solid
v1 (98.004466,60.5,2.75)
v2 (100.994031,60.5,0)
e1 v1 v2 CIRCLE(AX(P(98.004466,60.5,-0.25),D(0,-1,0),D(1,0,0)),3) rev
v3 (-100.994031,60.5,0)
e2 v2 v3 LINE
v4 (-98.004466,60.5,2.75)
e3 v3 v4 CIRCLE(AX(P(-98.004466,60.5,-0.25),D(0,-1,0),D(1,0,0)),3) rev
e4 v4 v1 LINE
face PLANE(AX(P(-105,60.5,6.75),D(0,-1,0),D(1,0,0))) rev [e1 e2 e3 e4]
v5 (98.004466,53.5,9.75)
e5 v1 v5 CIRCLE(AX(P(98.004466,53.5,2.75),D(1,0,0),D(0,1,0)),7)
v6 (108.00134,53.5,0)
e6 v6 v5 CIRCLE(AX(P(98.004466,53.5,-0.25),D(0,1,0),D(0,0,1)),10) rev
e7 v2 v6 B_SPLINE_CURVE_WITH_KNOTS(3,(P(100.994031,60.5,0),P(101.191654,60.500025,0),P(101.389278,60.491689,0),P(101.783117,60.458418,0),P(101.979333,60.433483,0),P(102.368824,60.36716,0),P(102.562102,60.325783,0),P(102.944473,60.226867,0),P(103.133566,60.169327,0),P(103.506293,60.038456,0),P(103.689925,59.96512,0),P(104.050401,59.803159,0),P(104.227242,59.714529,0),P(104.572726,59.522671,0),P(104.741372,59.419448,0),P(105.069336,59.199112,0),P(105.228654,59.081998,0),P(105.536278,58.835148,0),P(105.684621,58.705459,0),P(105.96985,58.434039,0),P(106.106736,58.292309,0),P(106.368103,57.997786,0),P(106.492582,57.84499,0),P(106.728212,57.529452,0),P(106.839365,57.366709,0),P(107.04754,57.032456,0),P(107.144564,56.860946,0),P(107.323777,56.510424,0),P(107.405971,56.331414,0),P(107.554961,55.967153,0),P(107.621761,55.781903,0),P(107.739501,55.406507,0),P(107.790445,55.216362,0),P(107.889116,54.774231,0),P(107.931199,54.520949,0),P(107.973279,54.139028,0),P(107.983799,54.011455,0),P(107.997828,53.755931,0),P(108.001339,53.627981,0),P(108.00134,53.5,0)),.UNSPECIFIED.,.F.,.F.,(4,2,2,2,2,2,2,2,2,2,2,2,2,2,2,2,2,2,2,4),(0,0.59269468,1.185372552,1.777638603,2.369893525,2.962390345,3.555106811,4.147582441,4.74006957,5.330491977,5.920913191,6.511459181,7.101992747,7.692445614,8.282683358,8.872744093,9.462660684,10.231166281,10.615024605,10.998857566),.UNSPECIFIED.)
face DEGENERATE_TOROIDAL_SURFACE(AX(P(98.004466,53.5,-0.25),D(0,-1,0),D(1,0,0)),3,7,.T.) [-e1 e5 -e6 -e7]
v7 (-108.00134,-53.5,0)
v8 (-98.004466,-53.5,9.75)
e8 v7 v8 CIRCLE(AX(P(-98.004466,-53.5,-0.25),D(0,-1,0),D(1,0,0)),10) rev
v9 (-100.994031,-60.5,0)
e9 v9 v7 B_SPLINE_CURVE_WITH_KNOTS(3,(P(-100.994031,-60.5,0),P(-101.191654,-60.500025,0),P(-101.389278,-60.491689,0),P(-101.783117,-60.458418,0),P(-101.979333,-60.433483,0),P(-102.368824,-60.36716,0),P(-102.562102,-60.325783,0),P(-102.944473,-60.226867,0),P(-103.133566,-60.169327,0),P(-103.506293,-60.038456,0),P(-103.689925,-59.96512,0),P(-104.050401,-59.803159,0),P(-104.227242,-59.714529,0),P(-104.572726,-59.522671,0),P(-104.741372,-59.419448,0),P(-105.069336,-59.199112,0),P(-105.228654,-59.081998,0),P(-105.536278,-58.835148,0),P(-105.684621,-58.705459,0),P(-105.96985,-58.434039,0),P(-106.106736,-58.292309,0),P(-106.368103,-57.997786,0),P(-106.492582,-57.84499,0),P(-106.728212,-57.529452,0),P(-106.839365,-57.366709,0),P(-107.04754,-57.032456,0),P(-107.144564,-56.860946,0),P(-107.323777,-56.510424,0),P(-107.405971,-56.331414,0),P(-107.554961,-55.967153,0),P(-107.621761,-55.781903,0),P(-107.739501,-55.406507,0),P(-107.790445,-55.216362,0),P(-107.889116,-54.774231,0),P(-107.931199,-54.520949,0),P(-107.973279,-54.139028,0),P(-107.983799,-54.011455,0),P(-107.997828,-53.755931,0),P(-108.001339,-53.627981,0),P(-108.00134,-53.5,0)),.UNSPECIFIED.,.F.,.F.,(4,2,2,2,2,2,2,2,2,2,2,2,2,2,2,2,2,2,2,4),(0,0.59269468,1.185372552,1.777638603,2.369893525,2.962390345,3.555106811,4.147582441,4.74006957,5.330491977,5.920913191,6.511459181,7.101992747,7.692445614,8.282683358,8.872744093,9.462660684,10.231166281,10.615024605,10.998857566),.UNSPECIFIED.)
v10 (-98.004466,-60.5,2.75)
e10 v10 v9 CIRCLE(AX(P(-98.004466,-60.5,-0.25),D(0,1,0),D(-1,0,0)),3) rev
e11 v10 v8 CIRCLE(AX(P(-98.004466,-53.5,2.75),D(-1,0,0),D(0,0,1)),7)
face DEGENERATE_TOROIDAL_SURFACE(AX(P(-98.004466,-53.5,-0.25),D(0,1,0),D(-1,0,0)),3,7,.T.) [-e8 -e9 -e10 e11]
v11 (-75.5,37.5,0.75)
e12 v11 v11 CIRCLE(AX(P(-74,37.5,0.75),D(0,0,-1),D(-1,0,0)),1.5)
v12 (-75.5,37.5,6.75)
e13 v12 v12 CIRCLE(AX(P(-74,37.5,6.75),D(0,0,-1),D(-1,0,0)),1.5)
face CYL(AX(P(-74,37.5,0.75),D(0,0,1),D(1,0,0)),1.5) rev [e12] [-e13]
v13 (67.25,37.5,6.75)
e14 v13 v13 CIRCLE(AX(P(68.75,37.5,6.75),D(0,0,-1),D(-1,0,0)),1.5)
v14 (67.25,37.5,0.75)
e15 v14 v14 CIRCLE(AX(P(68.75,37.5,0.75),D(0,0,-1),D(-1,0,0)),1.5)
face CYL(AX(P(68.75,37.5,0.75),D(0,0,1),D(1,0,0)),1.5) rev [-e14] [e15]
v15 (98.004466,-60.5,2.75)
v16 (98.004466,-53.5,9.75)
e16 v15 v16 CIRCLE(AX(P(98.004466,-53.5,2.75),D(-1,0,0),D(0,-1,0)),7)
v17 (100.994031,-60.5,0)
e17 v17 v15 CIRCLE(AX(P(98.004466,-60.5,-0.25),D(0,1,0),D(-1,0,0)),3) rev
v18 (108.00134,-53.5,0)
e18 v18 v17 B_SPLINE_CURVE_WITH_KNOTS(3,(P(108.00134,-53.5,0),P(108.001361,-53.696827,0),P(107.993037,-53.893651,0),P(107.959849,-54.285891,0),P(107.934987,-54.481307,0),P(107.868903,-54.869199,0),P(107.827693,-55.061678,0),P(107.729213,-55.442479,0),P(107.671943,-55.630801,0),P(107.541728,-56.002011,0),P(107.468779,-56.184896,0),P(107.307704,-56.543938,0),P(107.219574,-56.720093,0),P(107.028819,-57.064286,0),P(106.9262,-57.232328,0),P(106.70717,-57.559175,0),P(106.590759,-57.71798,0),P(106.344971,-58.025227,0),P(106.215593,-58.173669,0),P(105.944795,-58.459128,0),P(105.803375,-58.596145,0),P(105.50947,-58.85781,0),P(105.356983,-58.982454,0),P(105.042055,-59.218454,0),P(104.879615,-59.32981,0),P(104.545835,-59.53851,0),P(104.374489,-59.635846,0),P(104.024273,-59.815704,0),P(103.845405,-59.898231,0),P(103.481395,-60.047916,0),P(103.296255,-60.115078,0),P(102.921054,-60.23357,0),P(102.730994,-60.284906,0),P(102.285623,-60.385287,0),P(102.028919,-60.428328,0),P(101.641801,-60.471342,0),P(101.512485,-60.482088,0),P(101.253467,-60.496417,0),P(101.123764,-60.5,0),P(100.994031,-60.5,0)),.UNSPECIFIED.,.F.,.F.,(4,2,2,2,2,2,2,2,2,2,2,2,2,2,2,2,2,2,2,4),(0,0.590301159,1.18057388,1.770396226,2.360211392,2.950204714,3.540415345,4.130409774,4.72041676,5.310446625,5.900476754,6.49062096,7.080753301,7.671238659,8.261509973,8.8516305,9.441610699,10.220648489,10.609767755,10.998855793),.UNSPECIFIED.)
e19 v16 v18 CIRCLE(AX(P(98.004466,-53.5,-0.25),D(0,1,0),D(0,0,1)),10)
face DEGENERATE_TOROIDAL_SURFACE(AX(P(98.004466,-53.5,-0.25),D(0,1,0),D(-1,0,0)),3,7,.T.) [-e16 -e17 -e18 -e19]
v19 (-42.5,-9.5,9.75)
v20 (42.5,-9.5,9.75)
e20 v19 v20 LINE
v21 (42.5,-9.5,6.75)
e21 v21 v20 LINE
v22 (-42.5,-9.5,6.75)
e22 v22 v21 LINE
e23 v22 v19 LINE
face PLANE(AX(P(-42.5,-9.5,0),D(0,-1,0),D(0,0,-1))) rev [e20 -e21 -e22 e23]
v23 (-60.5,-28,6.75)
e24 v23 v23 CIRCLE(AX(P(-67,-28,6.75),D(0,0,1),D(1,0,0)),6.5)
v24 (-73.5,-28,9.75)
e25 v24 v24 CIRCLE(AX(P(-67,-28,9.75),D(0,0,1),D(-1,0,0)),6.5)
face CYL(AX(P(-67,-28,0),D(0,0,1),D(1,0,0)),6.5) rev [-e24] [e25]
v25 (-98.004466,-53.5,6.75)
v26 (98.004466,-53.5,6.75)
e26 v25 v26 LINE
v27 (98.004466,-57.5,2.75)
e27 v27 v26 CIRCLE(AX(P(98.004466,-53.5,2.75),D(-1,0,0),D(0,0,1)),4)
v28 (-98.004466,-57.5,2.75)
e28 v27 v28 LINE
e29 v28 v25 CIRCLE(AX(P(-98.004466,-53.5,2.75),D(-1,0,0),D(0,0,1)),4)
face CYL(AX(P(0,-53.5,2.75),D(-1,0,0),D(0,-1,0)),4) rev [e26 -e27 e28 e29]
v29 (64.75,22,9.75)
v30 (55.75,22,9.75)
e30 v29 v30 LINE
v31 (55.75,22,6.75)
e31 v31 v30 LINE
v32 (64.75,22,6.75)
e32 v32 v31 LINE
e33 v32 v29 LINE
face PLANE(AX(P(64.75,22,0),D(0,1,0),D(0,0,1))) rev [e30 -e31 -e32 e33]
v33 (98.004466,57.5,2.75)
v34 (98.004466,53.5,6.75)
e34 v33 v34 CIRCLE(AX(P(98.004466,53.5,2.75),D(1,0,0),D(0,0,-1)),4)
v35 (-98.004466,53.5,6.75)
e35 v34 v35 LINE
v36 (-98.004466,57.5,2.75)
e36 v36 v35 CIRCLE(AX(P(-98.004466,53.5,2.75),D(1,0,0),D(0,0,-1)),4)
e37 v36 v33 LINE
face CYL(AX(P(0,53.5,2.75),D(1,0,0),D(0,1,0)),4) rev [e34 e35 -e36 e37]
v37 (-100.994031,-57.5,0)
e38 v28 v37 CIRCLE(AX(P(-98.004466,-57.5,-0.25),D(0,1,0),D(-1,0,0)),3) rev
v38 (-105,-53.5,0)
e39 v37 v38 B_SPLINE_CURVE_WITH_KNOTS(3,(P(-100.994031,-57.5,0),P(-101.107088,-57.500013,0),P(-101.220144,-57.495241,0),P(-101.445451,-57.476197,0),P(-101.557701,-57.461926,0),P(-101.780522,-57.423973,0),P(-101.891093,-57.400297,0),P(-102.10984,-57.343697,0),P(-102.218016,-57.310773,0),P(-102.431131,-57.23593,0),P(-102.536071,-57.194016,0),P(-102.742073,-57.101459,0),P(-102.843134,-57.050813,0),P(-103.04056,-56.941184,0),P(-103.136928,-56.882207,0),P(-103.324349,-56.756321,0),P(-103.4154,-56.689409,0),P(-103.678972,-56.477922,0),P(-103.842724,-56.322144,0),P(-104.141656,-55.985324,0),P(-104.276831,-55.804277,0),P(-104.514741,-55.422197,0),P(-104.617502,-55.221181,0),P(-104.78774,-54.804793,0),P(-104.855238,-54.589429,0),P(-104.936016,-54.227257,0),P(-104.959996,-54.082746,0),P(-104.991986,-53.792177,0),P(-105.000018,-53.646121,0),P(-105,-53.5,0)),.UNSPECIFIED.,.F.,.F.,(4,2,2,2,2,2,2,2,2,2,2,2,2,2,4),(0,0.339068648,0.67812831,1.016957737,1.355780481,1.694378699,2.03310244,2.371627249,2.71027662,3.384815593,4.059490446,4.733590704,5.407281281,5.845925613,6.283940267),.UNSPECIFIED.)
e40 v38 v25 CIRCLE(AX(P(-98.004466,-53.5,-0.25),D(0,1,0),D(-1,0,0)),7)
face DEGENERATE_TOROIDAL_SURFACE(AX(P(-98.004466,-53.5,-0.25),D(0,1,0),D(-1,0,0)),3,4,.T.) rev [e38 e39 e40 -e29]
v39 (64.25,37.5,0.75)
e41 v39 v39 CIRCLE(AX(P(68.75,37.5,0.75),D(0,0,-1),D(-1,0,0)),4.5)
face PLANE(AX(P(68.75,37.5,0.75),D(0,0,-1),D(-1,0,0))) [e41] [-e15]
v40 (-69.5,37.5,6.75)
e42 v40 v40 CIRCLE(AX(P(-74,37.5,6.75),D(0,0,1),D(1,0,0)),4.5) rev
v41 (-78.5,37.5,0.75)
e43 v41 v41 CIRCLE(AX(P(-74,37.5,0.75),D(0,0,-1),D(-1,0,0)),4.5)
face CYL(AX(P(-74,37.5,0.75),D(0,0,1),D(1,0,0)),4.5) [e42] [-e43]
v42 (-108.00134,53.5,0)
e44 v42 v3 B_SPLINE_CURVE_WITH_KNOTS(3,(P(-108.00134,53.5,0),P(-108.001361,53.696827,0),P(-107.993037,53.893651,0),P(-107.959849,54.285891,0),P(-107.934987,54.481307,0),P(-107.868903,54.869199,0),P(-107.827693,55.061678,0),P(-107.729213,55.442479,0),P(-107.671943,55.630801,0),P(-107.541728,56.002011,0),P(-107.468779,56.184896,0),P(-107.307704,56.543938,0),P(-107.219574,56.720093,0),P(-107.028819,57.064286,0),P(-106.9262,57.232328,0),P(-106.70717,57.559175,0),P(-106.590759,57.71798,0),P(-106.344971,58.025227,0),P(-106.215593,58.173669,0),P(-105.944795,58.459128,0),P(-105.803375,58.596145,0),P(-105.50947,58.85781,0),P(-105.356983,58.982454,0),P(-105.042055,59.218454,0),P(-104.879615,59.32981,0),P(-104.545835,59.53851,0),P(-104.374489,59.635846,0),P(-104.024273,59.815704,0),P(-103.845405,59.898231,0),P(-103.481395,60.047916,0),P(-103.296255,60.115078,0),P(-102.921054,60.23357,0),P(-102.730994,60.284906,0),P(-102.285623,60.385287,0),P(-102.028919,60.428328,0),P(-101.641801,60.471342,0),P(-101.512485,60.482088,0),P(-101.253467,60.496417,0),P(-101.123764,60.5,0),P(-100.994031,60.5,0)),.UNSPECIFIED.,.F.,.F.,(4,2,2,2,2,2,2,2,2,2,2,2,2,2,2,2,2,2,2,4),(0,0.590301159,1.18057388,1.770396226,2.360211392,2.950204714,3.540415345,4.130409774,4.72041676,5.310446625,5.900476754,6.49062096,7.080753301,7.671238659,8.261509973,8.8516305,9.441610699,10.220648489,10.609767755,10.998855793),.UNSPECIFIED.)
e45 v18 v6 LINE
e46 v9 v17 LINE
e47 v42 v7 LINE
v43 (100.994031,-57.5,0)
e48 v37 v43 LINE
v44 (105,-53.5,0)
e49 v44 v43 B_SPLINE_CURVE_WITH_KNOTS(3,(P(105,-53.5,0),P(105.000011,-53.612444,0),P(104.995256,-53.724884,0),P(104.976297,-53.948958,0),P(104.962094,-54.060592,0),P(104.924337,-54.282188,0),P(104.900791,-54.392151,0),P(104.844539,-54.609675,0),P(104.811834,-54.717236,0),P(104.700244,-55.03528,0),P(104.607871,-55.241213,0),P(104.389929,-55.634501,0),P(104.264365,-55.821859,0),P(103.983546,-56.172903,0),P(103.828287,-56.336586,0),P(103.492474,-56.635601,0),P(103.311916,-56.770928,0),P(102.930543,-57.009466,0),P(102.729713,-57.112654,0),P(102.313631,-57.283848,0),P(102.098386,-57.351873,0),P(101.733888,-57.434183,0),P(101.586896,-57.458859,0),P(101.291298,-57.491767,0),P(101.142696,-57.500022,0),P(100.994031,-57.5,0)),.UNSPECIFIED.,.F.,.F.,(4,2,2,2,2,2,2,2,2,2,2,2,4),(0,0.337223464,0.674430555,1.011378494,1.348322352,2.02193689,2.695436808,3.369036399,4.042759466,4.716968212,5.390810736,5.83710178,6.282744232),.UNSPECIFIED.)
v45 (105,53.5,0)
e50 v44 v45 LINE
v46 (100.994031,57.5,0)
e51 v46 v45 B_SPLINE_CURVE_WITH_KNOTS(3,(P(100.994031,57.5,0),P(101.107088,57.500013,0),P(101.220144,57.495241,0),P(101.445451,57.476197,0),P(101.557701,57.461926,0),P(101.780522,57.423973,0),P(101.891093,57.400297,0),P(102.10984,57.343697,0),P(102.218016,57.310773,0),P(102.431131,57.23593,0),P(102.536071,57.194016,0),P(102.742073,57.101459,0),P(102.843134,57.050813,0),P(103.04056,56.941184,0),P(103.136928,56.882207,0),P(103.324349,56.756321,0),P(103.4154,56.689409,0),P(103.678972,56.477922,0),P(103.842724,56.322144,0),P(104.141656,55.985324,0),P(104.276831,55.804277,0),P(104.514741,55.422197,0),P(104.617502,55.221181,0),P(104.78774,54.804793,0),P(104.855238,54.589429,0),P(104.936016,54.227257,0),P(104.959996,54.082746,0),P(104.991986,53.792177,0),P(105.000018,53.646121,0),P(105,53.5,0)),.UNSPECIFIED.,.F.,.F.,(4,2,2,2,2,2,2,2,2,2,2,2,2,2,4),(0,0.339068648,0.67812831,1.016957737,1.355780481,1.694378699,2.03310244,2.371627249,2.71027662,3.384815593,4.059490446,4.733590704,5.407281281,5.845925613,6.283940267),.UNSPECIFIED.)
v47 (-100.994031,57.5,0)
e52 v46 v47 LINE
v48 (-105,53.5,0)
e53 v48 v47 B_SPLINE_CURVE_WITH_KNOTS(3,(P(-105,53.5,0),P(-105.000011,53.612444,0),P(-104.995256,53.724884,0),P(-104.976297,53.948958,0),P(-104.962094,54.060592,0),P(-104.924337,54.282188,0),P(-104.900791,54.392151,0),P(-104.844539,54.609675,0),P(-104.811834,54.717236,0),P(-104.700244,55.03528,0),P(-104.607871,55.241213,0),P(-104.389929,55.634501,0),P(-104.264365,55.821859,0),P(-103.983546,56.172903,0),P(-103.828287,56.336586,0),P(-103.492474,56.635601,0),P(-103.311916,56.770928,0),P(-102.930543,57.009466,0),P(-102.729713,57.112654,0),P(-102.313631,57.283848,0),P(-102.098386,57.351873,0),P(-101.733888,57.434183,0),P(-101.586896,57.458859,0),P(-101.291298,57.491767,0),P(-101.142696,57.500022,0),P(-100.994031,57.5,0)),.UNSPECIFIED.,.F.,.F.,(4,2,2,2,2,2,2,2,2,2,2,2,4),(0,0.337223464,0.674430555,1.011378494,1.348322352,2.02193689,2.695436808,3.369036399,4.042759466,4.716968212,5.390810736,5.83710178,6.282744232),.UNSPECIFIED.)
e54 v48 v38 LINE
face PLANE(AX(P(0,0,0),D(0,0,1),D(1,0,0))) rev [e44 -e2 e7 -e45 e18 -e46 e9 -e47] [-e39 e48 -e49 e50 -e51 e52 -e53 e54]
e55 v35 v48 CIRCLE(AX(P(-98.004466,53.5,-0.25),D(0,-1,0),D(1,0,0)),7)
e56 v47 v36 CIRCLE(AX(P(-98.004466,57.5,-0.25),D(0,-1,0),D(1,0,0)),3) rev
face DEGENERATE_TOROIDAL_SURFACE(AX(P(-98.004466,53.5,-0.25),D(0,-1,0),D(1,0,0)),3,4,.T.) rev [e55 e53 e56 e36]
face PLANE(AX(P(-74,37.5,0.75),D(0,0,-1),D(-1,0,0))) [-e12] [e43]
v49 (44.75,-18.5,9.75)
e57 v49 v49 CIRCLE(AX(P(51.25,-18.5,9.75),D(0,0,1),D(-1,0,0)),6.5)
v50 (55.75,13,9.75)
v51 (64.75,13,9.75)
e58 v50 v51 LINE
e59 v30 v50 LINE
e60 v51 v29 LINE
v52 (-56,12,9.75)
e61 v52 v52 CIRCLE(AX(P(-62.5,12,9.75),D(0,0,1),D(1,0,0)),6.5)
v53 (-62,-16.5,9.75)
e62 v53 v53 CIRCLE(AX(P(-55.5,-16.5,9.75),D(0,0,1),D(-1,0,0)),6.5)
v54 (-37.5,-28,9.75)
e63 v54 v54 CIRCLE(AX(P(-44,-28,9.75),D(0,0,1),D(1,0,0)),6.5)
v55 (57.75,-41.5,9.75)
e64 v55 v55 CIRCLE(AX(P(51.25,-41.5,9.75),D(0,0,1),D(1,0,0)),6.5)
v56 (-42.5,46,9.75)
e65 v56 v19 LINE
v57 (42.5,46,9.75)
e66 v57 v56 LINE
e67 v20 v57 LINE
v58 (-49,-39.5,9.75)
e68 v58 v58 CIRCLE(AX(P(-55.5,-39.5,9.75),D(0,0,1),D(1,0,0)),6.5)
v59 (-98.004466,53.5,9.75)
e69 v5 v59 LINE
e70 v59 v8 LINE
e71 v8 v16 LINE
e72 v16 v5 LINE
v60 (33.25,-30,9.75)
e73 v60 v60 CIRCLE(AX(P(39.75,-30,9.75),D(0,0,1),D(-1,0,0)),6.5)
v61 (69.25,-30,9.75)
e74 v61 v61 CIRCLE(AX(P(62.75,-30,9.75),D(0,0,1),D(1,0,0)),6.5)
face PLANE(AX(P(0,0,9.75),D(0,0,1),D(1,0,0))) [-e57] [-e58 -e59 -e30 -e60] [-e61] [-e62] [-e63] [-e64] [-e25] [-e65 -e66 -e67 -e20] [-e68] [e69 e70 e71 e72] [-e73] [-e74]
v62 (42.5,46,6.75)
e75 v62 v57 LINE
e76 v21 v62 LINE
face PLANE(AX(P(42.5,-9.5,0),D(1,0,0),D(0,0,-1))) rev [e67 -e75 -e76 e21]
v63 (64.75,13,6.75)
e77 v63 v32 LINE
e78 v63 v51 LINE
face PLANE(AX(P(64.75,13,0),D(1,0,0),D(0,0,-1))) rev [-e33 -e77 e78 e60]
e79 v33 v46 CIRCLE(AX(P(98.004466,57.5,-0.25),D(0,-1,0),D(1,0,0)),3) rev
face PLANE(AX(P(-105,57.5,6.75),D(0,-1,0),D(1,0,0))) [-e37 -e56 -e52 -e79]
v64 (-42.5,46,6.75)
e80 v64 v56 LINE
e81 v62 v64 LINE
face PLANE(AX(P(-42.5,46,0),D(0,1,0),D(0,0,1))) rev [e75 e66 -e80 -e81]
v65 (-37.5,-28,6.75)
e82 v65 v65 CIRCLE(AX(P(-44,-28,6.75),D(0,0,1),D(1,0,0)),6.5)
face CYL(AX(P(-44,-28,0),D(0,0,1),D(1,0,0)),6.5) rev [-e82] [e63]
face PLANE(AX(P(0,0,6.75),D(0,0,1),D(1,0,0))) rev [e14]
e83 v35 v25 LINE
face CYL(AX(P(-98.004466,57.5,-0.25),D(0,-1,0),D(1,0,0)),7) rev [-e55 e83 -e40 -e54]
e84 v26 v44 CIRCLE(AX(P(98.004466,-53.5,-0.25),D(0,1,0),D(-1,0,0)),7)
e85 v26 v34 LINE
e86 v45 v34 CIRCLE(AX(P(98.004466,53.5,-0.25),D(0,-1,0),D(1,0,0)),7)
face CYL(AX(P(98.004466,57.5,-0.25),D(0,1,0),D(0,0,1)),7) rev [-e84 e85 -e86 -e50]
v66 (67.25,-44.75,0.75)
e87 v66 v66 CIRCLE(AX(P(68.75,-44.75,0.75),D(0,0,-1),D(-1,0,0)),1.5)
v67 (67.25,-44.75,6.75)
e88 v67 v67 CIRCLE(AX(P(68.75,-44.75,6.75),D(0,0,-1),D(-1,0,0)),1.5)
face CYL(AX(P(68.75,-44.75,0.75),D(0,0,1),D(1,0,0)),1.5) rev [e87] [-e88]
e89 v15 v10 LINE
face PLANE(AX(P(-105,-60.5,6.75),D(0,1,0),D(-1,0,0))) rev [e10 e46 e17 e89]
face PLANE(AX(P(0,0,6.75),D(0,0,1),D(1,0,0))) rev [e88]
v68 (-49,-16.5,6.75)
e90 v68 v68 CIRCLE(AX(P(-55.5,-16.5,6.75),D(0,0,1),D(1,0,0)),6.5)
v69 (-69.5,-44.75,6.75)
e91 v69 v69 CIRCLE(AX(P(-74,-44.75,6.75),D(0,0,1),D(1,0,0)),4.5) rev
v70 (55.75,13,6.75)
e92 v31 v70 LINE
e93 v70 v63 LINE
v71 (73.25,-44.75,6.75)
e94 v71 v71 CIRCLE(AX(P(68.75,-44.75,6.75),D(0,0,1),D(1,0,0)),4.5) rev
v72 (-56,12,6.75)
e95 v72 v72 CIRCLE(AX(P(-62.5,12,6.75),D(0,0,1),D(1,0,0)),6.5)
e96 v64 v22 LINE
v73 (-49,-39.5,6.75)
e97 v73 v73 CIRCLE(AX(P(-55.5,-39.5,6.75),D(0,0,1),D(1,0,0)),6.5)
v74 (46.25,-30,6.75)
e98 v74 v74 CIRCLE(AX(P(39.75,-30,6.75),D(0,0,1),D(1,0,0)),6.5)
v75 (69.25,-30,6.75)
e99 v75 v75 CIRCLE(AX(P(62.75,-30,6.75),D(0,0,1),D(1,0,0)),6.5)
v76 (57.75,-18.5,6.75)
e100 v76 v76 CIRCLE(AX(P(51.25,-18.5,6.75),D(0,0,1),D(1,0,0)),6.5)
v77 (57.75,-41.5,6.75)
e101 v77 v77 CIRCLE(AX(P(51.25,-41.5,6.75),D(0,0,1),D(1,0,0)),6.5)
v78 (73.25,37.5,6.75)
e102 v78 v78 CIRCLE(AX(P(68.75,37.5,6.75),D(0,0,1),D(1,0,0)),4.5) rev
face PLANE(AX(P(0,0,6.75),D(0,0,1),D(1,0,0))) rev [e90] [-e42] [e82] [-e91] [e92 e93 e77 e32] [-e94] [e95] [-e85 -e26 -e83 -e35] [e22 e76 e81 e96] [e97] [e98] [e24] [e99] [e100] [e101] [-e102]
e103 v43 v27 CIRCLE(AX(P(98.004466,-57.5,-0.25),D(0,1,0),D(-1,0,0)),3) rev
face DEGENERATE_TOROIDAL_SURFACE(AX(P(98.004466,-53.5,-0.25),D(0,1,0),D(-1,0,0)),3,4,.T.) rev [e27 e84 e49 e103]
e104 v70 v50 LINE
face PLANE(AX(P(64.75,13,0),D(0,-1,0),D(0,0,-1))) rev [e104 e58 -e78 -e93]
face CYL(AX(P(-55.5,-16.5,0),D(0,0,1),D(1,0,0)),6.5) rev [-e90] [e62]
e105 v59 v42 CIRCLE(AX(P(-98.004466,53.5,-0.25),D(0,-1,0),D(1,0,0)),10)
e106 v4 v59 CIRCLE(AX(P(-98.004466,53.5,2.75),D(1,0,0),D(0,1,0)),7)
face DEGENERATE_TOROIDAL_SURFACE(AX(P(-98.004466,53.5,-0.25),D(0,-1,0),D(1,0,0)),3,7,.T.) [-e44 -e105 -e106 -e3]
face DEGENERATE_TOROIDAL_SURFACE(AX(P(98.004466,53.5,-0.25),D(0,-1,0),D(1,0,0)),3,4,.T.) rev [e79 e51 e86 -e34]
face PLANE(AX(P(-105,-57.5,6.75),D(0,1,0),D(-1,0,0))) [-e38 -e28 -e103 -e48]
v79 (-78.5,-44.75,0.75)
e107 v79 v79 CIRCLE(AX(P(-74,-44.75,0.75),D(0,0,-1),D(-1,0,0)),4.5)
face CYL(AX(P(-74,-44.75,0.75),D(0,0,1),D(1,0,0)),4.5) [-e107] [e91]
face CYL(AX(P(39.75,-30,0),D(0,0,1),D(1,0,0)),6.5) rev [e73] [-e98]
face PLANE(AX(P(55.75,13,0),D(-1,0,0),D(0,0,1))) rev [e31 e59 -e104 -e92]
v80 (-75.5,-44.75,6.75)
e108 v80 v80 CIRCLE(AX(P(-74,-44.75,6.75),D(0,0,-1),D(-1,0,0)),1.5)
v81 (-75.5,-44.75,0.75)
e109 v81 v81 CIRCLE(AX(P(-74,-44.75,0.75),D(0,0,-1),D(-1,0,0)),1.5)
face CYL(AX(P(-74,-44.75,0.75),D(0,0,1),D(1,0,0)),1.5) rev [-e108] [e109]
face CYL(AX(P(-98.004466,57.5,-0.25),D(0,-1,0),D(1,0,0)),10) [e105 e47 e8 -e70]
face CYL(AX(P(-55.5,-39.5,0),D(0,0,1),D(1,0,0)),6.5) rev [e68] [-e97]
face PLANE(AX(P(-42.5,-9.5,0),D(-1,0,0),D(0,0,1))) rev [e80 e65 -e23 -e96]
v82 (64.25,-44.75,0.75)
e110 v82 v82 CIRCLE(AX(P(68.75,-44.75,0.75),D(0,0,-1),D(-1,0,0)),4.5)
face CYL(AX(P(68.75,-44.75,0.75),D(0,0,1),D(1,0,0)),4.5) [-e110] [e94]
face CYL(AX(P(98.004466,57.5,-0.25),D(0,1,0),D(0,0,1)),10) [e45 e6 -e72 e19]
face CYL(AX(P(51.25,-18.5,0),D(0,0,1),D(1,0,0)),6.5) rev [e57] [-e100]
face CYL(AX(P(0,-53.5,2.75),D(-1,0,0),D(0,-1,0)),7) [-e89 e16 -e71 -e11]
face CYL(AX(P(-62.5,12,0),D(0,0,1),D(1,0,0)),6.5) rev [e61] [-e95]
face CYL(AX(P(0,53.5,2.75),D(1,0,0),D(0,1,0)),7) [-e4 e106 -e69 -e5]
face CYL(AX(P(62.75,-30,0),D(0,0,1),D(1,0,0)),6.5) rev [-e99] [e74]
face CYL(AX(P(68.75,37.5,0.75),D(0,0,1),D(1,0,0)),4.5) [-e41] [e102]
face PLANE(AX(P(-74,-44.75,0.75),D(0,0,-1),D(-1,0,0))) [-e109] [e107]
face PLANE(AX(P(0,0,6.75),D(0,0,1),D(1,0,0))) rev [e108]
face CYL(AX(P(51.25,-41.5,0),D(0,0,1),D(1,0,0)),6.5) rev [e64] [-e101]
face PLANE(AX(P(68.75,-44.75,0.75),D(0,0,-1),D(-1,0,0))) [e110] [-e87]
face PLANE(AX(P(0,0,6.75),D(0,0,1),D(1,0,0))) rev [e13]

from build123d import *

# Parameters (mm, degrees)
SKETCH_1_W          = 210
SKETCH_1_H          = 115
EXTRUDE_6_DEPTH     = 6.75
FILLET_6_R          = 7
FILLET_7_R          = 4
SHELL_6_T           = 3
SKETCH_10_W         = 85
SKETCH_10_H         = 55.5
CUT_EXTRUDE_1_DEPTH = 125.175690155
SKETCH_11_R         = 6.5
SKETCH_11_W         = 9
SKETCH_11_H         = 9
CUT_EXTRUDE_2_DEPTH = 125.175690155
SKETCH_12_R         = 4.5
SKETCH_12_R_2       = 1.5
EXTRUDE_9_DEPTH     = 6


with BuildPart() as part:
    # Эскиз1 → Бобышка-Вытянуть6 (new body)
    with BuildSketch(Plane.XY):
        Rectangle(SKETCH_1_W, SKETCH_1_H)
    extrude(amount=EXTRUDE_6_DEPTH)

    # Скругление6
    # the kernel refuses this fillet: 7 mm, written as the material it takes off along each edge
    with BuildSketch(Plane(origin=(105, 74.988835725, 6.75), x_dir=(0, 0, -1), z_dir=(0, -1, 0)), Plane(origin=(-105, -74.988835725, 6.75), x_dir=(0, 0, -1), z_dir=(0, 1, 0))) as fillet_6_piece_1:
        with BuildLine():
            CenterArc((7, -6.99553429), FILLET_6_R, 92.046713098, 87.953286902)
            Line((0, -6.99553429), (-0.14, -6.99553429))
            Line((-0.14, -6.99553429), (-0.14, 0))
            Line((-0.14, 0), (0, 0.14))
            ThreePointArc((0, 0.14), (3.375, 0.14), (6.745, 0.139910686))
            Line((6.745, 0.139910686), (6.75, 0))
        make_face()
    extrude(amount=149.977671449, mode=Mode.SUBTRACT)

    # Скругление7
    fillet_7_edges = [part.edges().sort_by_distance(p)[0] for p in [
        (0, -57.5, 6.75),
        (0, 57.5, 6.75),
        (-102.865021234, 57.5, 4.78736042),
        (102.865021234, 57.5, 4.78736042),
        (-102.865021234, -57.5, 4.78736042),
        (102.865021234, -57.5, 4.78736042),
    ]]
    fillet(fillet_7_edges, radius=FILLET_7_R)

    # Оболочка6
    shell_6_openings = [part.faces().sort_by_distance(p)[0] for p in [
        (0, -1.3e-08, 0),
    ]]
    offset(amount=SHELL_6_T, openings=shell_6_openings, kind=Kind.INTERSECTION)

    # Эскиз10 → Вырез-Вытянуть1 (cut, through all)
    with BuildSketch(Plane.XY.offset(9.75)):
        with Locations((0, 18.25)):
            Rectangle(SKETCH_10_W, SKETCH_10_H)
    extrude(amount=-CUT_EXTRUDE_1_DEPTH, mode=Mode.SUBTRACT)

    # Эскиз11 → Вырез-Вытянуть2 (cut, through all)
    with BuildSketch(Plane.XY.offset(9.75)):
        with Locations((-44, -28)):
            Circle(SKETCH_11_R)
        with Locations((-55.5, -39.5)):
            Circle(SKETCH_11_R)
        with Locations((-55.5, -16.5)):
            Circle(SKETCH_11_R)
        with Locations((-67, -28)):
            Circle(SKETCH_11_R)
        with Locations((51.25, -18.5)):
            Circle(SKETCH_11_R)
        with Locations((62.75, -30)):
            Circle(SKETCH_11_R)
        with Locations((51.25, -41.5)):
            Circle(SKETCH_11_R)
        with Locations((39.75, -30)):
            Circle(SKETCH_11_R)
        with Locations((-62.5, 12)):
            Circle(SKETCH_11_R)
        with Locations((60.25, 17.5)):
            Rectangle(SKETCH_11_W, SKETCH_11_H)
    extrude(amount=-CUT_EXTRUDE_2_DEPTH, mode=Mode.SUBTRACT)

    # Эскиз12 → Бобышка-Вытянуть9 (add)
    # profile 1 of 4: a face of its own
    with BuildSketch(Plane(origin=(0, 0, 6.75), x_dir=(-1, 0, 0), z_dir=(0, 0, -1))):
        with Locations(Location((74, 37.5, 0), (0, 0, 180))):
            Circle(SKETCH_12_R)
        with Locations((74, 37.5)):
            Circle(SKETCH_12_R_2, mode=Mode.SUBTRACT)
    # profile 2 of 4: a face of its own
    with BuildSketch(Plane(origin=(0, 0, 6.75), x_dir=(-1, 0, 0), z_dir=(0, 0, -1))):
        with Locations(Location((-68.75, 37.5, 0), (0, 0, 180))):
            Circle(SKETCH_12_R)
        with Locations((-68.75, 37.5)):
            Circle(SKETCH_12_R_2, mode=Mode.SUBTRACT)
    # profile 3 of 4: a face of its own
    with BuildSketch(Plane(origin=(0, 0, 6.75), x_dir=(-1, 0, 0), z_dir=(0, 0, -1))):
        with Locations(Location((74, -44.75, 0), (0, 0, 180))):
            Circle(SKETCH_12_R)
        with Locations((74, -44.75)):
            Circle(SKETCH_12_R_2, mode=Mode.SUBTRACT)
    # profile 4 of 4: a face of its own
    with BuildSketch(Plane(origin=(0, 0, 6.75), x_dir=(-1, 0, 0), z_dir=(0, 0, -1))):
        with Locations(Location((-68.75, -44.75, 0), (0, 0, 180))):
            Circle(SKETCH_12_R)
        with Locations((-68.75, -44.75)):
            Circle(SKETCH_12_R_2, mode=Mode.SUBTRACT)
    extrude(amount=EXTRUDE_9_DEPTH)


solid = part.part
